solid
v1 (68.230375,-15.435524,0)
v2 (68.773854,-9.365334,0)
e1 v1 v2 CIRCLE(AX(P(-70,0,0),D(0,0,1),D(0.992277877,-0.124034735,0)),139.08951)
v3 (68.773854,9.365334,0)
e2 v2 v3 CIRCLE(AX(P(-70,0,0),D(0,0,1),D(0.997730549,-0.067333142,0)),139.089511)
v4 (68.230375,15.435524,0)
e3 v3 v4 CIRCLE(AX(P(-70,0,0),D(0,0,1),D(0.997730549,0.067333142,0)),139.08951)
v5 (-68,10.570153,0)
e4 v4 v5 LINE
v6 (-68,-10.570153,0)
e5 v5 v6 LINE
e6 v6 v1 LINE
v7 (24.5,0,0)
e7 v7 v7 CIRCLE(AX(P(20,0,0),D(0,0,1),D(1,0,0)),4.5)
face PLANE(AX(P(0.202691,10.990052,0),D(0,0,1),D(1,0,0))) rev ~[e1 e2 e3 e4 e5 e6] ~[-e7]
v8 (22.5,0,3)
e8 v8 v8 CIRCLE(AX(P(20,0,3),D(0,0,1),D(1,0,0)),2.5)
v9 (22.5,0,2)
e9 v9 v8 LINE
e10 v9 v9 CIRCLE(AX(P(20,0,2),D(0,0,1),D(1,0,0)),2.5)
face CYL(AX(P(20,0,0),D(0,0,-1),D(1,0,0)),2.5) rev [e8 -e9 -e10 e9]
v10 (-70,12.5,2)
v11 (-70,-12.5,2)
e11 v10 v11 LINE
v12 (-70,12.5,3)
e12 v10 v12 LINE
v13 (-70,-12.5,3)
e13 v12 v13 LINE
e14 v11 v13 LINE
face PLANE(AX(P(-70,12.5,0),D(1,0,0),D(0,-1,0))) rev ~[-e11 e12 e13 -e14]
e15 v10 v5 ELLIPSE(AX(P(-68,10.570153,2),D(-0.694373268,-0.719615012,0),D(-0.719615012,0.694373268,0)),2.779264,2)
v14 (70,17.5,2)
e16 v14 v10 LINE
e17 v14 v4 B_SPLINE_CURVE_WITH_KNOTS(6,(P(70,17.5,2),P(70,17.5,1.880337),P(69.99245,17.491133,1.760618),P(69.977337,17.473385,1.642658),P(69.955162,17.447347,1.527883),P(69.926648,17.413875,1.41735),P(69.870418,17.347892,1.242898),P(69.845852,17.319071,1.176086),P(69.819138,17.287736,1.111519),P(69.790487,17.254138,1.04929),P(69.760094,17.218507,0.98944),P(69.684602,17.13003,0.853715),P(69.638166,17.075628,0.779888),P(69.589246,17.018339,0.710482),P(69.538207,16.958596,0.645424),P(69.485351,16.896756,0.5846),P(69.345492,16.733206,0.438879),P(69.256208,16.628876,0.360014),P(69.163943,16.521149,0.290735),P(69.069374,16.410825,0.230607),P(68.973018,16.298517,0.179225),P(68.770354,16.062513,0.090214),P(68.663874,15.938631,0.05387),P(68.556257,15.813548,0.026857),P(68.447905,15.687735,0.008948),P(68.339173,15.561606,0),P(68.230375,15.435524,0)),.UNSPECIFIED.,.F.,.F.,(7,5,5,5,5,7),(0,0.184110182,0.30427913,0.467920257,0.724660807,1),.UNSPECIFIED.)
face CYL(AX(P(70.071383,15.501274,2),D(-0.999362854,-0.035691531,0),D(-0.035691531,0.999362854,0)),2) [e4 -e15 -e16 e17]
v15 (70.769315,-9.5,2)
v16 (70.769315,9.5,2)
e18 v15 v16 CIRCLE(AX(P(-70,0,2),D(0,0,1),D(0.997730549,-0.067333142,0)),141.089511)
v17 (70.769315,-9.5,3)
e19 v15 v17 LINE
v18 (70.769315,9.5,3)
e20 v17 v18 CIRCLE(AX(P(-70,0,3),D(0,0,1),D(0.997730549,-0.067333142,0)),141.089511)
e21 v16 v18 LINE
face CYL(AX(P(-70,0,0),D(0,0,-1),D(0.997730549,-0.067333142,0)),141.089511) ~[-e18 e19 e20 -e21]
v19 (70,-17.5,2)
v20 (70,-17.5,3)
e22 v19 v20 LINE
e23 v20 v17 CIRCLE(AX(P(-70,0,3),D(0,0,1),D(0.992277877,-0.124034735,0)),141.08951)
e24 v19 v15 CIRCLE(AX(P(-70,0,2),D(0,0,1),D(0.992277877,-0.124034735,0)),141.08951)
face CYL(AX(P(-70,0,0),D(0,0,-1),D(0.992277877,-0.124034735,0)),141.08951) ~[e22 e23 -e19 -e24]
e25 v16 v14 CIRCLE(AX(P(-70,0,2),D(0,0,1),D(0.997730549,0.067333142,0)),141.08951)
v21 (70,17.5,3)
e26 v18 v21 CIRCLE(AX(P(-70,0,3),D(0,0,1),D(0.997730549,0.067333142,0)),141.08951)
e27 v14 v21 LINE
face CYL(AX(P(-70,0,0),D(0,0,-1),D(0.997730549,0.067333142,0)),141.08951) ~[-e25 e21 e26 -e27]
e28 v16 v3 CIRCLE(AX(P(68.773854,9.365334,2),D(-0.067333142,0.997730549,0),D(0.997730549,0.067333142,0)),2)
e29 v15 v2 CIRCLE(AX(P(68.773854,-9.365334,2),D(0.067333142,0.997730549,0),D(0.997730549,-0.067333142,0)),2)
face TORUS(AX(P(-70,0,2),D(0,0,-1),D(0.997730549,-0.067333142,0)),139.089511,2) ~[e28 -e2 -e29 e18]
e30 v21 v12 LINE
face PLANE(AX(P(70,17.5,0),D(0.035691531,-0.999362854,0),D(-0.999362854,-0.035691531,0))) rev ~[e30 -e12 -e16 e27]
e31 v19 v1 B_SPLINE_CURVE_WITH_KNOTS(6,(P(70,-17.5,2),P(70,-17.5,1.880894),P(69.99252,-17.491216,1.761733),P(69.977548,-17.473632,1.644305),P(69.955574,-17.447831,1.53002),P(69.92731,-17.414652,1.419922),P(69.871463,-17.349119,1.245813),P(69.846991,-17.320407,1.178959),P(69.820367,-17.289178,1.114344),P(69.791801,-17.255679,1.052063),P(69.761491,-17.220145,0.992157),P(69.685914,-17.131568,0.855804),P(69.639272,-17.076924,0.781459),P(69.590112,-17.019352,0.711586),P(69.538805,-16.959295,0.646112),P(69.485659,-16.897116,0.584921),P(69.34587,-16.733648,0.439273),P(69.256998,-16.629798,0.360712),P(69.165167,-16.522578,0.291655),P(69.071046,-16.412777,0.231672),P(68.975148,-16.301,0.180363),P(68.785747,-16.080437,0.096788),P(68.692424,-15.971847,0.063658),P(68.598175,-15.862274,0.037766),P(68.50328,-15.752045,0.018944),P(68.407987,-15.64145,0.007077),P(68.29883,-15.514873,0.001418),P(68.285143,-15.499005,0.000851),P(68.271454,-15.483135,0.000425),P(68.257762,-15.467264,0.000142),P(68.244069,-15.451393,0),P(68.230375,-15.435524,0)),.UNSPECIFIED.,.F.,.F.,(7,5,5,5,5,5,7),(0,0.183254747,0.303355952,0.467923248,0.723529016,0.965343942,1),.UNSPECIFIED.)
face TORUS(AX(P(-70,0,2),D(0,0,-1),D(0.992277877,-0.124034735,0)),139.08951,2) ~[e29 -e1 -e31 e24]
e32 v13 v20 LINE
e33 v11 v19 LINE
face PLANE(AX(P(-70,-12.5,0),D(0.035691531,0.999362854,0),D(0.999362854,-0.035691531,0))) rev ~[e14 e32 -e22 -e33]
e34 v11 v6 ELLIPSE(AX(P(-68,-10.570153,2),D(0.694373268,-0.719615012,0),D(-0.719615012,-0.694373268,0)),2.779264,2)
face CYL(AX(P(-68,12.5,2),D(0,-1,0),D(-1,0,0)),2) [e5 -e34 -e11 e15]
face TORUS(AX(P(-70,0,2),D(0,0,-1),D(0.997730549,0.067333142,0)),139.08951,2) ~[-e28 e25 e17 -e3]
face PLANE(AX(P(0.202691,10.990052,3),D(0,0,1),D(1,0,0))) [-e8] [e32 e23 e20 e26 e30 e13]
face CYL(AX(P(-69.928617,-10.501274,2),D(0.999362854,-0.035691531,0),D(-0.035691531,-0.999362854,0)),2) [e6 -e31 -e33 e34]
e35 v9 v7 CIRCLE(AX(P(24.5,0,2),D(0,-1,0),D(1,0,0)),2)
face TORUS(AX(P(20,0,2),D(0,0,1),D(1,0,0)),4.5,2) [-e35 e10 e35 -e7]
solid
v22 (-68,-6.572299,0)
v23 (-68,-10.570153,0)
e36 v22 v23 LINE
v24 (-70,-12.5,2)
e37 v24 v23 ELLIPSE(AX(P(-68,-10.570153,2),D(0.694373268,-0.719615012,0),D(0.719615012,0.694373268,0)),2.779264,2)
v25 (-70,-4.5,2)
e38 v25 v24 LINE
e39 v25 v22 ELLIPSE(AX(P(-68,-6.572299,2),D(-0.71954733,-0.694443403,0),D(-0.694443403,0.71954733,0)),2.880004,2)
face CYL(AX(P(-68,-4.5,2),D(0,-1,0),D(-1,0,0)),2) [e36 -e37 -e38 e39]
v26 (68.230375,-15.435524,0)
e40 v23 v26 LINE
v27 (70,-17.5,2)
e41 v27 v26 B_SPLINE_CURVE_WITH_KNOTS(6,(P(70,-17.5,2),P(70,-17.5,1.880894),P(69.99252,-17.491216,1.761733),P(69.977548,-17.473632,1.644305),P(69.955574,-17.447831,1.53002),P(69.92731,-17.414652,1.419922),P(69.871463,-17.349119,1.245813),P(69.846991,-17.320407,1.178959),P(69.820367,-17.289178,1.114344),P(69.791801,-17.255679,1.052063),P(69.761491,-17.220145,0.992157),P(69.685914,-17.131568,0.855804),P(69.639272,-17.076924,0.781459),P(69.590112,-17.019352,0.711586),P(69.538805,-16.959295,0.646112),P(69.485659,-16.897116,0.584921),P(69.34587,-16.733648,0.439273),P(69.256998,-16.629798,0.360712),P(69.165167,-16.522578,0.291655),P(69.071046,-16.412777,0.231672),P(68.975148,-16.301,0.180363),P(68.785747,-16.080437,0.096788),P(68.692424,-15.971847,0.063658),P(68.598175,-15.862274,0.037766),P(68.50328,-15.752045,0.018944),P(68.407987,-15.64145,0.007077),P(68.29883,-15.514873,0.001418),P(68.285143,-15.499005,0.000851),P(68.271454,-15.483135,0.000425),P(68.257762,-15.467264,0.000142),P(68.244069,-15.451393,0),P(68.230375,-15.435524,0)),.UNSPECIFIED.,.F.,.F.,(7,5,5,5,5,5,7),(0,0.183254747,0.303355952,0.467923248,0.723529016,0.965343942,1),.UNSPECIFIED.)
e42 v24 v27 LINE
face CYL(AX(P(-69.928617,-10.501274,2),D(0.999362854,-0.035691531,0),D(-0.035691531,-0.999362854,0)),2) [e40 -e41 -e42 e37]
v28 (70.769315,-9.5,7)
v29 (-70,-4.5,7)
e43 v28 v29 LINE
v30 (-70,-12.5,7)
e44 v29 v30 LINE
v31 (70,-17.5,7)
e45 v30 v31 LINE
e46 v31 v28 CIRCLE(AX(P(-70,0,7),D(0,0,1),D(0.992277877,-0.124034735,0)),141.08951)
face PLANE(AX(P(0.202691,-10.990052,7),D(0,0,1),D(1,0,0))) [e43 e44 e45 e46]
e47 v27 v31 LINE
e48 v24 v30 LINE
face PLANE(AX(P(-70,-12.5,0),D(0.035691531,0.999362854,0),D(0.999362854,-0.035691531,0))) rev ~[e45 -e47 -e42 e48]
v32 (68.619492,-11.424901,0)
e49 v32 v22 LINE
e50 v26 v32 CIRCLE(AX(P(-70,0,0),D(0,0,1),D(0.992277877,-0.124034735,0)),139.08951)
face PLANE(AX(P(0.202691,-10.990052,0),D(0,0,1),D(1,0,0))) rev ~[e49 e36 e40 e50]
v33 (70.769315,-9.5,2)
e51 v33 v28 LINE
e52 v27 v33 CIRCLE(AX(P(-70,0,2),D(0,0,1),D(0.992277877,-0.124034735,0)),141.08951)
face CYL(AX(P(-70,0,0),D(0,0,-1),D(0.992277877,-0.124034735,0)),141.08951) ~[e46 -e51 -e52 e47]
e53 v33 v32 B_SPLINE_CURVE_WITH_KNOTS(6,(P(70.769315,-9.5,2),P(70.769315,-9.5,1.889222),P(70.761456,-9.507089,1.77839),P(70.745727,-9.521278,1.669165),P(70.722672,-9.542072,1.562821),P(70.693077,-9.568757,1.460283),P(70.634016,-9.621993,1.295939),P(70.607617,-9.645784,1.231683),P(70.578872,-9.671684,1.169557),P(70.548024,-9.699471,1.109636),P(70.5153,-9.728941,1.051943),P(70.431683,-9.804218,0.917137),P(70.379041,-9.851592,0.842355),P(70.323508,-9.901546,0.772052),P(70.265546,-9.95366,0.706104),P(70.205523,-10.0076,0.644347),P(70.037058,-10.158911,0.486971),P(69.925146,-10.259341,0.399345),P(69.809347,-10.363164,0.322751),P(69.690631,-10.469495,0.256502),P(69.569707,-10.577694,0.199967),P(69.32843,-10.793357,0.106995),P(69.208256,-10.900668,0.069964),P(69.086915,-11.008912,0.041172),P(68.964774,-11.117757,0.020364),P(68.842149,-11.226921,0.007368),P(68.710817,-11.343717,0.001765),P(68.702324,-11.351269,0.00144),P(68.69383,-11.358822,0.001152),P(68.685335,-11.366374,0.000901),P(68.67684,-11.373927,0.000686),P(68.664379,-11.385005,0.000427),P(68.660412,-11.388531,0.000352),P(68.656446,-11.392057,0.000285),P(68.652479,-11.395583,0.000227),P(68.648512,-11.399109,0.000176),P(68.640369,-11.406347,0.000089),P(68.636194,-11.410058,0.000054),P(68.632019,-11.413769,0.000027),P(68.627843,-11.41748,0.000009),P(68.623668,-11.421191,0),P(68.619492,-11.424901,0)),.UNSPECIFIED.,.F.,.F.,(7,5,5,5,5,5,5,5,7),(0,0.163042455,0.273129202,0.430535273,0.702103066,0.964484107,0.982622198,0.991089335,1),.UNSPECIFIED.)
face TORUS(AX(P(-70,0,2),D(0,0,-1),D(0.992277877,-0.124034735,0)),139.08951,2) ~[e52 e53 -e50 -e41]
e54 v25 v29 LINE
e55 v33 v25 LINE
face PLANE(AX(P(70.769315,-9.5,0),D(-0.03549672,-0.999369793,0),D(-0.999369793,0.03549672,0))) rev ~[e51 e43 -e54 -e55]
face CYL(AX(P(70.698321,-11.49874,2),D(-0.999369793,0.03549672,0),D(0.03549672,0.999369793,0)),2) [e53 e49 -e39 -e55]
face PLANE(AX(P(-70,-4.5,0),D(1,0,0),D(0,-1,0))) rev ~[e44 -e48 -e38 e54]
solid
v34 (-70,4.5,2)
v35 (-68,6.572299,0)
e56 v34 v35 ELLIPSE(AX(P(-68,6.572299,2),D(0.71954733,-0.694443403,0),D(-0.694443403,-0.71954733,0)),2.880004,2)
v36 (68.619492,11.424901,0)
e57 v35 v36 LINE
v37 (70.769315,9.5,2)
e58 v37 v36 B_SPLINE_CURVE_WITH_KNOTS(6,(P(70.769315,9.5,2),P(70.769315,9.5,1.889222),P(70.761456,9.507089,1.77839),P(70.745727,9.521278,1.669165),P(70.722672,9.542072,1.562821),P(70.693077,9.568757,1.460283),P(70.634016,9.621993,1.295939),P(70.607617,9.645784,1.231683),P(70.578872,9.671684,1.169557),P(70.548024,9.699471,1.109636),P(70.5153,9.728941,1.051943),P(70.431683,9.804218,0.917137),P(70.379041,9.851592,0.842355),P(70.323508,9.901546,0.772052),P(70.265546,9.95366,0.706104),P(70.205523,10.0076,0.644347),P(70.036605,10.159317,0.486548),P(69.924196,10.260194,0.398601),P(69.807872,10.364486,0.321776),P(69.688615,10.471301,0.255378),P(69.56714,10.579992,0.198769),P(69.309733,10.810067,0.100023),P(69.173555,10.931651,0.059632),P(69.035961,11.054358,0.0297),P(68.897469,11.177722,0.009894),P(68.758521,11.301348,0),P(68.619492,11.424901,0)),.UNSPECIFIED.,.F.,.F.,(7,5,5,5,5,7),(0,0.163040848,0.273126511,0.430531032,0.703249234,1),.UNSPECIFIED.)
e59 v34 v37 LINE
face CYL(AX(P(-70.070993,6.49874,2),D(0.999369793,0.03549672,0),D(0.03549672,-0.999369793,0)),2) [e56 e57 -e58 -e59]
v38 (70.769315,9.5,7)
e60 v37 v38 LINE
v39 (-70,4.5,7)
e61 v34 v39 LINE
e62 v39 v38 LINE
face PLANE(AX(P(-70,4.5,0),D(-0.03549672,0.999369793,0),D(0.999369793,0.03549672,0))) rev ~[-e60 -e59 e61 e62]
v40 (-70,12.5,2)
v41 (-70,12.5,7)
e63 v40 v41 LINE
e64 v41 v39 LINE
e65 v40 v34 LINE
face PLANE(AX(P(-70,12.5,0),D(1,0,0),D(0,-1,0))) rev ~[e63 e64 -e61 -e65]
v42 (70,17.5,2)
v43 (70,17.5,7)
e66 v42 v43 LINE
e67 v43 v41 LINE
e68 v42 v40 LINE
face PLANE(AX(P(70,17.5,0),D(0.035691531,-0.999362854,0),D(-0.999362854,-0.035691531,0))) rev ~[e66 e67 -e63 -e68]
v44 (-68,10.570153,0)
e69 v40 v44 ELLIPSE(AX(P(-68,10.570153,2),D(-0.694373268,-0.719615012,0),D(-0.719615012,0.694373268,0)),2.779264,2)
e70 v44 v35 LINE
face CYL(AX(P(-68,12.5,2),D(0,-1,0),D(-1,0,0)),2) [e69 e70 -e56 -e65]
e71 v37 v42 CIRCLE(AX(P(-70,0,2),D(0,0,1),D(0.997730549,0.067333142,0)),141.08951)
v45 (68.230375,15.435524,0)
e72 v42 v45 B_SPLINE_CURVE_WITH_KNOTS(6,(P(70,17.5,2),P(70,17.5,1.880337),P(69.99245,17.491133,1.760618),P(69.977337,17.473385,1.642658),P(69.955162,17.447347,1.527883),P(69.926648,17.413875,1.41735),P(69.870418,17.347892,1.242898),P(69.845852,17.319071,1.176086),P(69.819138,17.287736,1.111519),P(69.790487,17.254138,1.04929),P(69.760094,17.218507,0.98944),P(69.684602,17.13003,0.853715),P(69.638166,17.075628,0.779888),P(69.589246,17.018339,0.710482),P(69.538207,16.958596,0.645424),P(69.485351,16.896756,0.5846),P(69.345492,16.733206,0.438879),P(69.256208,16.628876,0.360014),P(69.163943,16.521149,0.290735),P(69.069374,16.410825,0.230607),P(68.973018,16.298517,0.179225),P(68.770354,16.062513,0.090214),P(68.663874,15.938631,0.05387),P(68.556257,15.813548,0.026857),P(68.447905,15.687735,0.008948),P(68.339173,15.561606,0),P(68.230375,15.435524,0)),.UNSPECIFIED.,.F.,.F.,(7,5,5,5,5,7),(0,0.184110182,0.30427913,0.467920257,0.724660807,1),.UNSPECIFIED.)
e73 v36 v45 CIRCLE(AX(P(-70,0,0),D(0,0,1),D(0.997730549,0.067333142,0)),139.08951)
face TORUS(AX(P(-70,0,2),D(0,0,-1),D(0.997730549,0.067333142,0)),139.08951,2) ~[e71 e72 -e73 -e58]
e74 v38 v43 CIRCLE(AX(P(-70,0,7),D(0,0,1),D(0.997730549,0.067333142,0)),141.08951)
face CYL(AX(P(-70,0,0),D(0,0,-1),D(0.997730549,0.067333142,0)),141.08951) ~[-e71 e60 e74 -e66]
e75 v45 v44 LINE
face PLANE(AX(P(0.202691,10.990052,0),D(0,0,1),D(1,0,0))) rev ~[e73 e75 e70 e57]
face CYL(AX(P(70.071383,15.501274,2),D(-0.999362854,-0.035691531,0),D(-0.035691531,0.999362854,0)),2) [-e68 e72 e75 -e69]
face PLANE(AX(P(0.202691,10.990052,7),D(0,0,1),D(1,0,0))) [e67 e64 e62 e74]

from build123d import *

# Parameters (mm, degrees)
F1_DEPTH = 7
F0_R     = 2.5
F2_DEPTH = 3
F3_R     = 2
F3_2_R   = 2
F3_3_R   = 2


with BuildPart() as f1:
    # F0 (on Top) → F1 (new body)
    with BuildSketch(Plane.XY):
        with BuildLine():
            Line((70, 17.5), (-70, 12.5))
            Line((-70, 12.5), (-70, 4.5))
            Line((-70, 4.5), (70.7693148381, 9.5))
            ThreePointArc((70.7693148381, 9.5), (70.4416321419, 13.5054789375), (70, 17.5))
        make_face()
    extrude(amount=F1_DEPTH)

    # F3#2
    f3_2_edges = [f1.edges().sort_by_distance(p)[0] for p in [
        (0, 15, 0),
        (-70, 8.5, 0),
        (0.384657, 7, 0),
        (70.441632, 13.505479, 0),
    ]]
    fillet(f3_2_edges, radius=F3_2_R)


with BuildPart() as f1b:
    # F0 (on Top) → F1, piece 2 (new body)
    with BuildSketch(Plane.XY):
        with BuildLine():
            Line((70.7693148381, -9.5), (-70, -4.5))
            Line((-70, -4.5), (-70, -12.5))
            Line((-70, -12.5), (70, -17.5))
            ThreePointArc((70, -17.5), (70.4416321419, -13.5054789375), (70.7693148381, -9.5))
        make_face()
    extrude(amount=F1_DEPTH)

    # F3#3
    f3_3_edges = [f1b.edges().sort_by_distance(p)[0] for p in [
        (0, -15, 0),
        (0.384657, -7, 0),
        (-70, -8.5, 0),
        (70.441632, -13.505479, 0),
    ]]
    fillet(f3_3_edges, radius=F3_3_R)


with BuildPart() as f2:
    # F0 (on Top) → F2 (new body)
    with BuildSketch(Plane.XY):
        with BuildLine():
            Line((70, 17.5), (-70, 12.5))
            Line((-70, 12.5), (-70, 4.5))
            Line((-70, 4.5), (70.7693148381, 9.5))
            ThreePointArc((70.7693148381, 9.5), (70.4416321419, 13.5054789375), (70, 17.5))
        make_face()
        with BuildLine():
            Line((70.7693148381, 9.5), (-70, 4.5))
            Line((-70, 4.5), (-70, -4.5))
            Line((-70, -4.5), (70.7693148381, -9.5))
            ThreePointArc((70.7693148381, -9.5), (71.0895105952, 0), (70.7693148381, 9.5))
        make_face()
        with Locations((20, 0)):
            Circle(F0_R, mode=Mode.SUBTRACT)
        with BuildLine():
            Line((70.7693148381, -9.5), (-70, -4.5))
            Line((-70, -4.5), (-70, -12.5))
            Line((-70, -12.5), (70, -17.5))
            ThreePointArc((70, -17.5), (70.4416321419, -13.5054789375), (70.7693148381, -9.5))
        make_face()
    extrude(amount=F2_DEPTH)

    # F3
    f3_edges = [f2.edges().sort_by_distance(p)[0] for p in [
        (0, 15, 0),
        (-70, 0, 0),
        (0, -15, 0),
        (71.089511, 0, 0),
        (17.5, 0, 0),
    ]]
    fillet(f3_edges, radius=F3_R)


solid = Compound([f1.part, f1b.part, f2.part])
